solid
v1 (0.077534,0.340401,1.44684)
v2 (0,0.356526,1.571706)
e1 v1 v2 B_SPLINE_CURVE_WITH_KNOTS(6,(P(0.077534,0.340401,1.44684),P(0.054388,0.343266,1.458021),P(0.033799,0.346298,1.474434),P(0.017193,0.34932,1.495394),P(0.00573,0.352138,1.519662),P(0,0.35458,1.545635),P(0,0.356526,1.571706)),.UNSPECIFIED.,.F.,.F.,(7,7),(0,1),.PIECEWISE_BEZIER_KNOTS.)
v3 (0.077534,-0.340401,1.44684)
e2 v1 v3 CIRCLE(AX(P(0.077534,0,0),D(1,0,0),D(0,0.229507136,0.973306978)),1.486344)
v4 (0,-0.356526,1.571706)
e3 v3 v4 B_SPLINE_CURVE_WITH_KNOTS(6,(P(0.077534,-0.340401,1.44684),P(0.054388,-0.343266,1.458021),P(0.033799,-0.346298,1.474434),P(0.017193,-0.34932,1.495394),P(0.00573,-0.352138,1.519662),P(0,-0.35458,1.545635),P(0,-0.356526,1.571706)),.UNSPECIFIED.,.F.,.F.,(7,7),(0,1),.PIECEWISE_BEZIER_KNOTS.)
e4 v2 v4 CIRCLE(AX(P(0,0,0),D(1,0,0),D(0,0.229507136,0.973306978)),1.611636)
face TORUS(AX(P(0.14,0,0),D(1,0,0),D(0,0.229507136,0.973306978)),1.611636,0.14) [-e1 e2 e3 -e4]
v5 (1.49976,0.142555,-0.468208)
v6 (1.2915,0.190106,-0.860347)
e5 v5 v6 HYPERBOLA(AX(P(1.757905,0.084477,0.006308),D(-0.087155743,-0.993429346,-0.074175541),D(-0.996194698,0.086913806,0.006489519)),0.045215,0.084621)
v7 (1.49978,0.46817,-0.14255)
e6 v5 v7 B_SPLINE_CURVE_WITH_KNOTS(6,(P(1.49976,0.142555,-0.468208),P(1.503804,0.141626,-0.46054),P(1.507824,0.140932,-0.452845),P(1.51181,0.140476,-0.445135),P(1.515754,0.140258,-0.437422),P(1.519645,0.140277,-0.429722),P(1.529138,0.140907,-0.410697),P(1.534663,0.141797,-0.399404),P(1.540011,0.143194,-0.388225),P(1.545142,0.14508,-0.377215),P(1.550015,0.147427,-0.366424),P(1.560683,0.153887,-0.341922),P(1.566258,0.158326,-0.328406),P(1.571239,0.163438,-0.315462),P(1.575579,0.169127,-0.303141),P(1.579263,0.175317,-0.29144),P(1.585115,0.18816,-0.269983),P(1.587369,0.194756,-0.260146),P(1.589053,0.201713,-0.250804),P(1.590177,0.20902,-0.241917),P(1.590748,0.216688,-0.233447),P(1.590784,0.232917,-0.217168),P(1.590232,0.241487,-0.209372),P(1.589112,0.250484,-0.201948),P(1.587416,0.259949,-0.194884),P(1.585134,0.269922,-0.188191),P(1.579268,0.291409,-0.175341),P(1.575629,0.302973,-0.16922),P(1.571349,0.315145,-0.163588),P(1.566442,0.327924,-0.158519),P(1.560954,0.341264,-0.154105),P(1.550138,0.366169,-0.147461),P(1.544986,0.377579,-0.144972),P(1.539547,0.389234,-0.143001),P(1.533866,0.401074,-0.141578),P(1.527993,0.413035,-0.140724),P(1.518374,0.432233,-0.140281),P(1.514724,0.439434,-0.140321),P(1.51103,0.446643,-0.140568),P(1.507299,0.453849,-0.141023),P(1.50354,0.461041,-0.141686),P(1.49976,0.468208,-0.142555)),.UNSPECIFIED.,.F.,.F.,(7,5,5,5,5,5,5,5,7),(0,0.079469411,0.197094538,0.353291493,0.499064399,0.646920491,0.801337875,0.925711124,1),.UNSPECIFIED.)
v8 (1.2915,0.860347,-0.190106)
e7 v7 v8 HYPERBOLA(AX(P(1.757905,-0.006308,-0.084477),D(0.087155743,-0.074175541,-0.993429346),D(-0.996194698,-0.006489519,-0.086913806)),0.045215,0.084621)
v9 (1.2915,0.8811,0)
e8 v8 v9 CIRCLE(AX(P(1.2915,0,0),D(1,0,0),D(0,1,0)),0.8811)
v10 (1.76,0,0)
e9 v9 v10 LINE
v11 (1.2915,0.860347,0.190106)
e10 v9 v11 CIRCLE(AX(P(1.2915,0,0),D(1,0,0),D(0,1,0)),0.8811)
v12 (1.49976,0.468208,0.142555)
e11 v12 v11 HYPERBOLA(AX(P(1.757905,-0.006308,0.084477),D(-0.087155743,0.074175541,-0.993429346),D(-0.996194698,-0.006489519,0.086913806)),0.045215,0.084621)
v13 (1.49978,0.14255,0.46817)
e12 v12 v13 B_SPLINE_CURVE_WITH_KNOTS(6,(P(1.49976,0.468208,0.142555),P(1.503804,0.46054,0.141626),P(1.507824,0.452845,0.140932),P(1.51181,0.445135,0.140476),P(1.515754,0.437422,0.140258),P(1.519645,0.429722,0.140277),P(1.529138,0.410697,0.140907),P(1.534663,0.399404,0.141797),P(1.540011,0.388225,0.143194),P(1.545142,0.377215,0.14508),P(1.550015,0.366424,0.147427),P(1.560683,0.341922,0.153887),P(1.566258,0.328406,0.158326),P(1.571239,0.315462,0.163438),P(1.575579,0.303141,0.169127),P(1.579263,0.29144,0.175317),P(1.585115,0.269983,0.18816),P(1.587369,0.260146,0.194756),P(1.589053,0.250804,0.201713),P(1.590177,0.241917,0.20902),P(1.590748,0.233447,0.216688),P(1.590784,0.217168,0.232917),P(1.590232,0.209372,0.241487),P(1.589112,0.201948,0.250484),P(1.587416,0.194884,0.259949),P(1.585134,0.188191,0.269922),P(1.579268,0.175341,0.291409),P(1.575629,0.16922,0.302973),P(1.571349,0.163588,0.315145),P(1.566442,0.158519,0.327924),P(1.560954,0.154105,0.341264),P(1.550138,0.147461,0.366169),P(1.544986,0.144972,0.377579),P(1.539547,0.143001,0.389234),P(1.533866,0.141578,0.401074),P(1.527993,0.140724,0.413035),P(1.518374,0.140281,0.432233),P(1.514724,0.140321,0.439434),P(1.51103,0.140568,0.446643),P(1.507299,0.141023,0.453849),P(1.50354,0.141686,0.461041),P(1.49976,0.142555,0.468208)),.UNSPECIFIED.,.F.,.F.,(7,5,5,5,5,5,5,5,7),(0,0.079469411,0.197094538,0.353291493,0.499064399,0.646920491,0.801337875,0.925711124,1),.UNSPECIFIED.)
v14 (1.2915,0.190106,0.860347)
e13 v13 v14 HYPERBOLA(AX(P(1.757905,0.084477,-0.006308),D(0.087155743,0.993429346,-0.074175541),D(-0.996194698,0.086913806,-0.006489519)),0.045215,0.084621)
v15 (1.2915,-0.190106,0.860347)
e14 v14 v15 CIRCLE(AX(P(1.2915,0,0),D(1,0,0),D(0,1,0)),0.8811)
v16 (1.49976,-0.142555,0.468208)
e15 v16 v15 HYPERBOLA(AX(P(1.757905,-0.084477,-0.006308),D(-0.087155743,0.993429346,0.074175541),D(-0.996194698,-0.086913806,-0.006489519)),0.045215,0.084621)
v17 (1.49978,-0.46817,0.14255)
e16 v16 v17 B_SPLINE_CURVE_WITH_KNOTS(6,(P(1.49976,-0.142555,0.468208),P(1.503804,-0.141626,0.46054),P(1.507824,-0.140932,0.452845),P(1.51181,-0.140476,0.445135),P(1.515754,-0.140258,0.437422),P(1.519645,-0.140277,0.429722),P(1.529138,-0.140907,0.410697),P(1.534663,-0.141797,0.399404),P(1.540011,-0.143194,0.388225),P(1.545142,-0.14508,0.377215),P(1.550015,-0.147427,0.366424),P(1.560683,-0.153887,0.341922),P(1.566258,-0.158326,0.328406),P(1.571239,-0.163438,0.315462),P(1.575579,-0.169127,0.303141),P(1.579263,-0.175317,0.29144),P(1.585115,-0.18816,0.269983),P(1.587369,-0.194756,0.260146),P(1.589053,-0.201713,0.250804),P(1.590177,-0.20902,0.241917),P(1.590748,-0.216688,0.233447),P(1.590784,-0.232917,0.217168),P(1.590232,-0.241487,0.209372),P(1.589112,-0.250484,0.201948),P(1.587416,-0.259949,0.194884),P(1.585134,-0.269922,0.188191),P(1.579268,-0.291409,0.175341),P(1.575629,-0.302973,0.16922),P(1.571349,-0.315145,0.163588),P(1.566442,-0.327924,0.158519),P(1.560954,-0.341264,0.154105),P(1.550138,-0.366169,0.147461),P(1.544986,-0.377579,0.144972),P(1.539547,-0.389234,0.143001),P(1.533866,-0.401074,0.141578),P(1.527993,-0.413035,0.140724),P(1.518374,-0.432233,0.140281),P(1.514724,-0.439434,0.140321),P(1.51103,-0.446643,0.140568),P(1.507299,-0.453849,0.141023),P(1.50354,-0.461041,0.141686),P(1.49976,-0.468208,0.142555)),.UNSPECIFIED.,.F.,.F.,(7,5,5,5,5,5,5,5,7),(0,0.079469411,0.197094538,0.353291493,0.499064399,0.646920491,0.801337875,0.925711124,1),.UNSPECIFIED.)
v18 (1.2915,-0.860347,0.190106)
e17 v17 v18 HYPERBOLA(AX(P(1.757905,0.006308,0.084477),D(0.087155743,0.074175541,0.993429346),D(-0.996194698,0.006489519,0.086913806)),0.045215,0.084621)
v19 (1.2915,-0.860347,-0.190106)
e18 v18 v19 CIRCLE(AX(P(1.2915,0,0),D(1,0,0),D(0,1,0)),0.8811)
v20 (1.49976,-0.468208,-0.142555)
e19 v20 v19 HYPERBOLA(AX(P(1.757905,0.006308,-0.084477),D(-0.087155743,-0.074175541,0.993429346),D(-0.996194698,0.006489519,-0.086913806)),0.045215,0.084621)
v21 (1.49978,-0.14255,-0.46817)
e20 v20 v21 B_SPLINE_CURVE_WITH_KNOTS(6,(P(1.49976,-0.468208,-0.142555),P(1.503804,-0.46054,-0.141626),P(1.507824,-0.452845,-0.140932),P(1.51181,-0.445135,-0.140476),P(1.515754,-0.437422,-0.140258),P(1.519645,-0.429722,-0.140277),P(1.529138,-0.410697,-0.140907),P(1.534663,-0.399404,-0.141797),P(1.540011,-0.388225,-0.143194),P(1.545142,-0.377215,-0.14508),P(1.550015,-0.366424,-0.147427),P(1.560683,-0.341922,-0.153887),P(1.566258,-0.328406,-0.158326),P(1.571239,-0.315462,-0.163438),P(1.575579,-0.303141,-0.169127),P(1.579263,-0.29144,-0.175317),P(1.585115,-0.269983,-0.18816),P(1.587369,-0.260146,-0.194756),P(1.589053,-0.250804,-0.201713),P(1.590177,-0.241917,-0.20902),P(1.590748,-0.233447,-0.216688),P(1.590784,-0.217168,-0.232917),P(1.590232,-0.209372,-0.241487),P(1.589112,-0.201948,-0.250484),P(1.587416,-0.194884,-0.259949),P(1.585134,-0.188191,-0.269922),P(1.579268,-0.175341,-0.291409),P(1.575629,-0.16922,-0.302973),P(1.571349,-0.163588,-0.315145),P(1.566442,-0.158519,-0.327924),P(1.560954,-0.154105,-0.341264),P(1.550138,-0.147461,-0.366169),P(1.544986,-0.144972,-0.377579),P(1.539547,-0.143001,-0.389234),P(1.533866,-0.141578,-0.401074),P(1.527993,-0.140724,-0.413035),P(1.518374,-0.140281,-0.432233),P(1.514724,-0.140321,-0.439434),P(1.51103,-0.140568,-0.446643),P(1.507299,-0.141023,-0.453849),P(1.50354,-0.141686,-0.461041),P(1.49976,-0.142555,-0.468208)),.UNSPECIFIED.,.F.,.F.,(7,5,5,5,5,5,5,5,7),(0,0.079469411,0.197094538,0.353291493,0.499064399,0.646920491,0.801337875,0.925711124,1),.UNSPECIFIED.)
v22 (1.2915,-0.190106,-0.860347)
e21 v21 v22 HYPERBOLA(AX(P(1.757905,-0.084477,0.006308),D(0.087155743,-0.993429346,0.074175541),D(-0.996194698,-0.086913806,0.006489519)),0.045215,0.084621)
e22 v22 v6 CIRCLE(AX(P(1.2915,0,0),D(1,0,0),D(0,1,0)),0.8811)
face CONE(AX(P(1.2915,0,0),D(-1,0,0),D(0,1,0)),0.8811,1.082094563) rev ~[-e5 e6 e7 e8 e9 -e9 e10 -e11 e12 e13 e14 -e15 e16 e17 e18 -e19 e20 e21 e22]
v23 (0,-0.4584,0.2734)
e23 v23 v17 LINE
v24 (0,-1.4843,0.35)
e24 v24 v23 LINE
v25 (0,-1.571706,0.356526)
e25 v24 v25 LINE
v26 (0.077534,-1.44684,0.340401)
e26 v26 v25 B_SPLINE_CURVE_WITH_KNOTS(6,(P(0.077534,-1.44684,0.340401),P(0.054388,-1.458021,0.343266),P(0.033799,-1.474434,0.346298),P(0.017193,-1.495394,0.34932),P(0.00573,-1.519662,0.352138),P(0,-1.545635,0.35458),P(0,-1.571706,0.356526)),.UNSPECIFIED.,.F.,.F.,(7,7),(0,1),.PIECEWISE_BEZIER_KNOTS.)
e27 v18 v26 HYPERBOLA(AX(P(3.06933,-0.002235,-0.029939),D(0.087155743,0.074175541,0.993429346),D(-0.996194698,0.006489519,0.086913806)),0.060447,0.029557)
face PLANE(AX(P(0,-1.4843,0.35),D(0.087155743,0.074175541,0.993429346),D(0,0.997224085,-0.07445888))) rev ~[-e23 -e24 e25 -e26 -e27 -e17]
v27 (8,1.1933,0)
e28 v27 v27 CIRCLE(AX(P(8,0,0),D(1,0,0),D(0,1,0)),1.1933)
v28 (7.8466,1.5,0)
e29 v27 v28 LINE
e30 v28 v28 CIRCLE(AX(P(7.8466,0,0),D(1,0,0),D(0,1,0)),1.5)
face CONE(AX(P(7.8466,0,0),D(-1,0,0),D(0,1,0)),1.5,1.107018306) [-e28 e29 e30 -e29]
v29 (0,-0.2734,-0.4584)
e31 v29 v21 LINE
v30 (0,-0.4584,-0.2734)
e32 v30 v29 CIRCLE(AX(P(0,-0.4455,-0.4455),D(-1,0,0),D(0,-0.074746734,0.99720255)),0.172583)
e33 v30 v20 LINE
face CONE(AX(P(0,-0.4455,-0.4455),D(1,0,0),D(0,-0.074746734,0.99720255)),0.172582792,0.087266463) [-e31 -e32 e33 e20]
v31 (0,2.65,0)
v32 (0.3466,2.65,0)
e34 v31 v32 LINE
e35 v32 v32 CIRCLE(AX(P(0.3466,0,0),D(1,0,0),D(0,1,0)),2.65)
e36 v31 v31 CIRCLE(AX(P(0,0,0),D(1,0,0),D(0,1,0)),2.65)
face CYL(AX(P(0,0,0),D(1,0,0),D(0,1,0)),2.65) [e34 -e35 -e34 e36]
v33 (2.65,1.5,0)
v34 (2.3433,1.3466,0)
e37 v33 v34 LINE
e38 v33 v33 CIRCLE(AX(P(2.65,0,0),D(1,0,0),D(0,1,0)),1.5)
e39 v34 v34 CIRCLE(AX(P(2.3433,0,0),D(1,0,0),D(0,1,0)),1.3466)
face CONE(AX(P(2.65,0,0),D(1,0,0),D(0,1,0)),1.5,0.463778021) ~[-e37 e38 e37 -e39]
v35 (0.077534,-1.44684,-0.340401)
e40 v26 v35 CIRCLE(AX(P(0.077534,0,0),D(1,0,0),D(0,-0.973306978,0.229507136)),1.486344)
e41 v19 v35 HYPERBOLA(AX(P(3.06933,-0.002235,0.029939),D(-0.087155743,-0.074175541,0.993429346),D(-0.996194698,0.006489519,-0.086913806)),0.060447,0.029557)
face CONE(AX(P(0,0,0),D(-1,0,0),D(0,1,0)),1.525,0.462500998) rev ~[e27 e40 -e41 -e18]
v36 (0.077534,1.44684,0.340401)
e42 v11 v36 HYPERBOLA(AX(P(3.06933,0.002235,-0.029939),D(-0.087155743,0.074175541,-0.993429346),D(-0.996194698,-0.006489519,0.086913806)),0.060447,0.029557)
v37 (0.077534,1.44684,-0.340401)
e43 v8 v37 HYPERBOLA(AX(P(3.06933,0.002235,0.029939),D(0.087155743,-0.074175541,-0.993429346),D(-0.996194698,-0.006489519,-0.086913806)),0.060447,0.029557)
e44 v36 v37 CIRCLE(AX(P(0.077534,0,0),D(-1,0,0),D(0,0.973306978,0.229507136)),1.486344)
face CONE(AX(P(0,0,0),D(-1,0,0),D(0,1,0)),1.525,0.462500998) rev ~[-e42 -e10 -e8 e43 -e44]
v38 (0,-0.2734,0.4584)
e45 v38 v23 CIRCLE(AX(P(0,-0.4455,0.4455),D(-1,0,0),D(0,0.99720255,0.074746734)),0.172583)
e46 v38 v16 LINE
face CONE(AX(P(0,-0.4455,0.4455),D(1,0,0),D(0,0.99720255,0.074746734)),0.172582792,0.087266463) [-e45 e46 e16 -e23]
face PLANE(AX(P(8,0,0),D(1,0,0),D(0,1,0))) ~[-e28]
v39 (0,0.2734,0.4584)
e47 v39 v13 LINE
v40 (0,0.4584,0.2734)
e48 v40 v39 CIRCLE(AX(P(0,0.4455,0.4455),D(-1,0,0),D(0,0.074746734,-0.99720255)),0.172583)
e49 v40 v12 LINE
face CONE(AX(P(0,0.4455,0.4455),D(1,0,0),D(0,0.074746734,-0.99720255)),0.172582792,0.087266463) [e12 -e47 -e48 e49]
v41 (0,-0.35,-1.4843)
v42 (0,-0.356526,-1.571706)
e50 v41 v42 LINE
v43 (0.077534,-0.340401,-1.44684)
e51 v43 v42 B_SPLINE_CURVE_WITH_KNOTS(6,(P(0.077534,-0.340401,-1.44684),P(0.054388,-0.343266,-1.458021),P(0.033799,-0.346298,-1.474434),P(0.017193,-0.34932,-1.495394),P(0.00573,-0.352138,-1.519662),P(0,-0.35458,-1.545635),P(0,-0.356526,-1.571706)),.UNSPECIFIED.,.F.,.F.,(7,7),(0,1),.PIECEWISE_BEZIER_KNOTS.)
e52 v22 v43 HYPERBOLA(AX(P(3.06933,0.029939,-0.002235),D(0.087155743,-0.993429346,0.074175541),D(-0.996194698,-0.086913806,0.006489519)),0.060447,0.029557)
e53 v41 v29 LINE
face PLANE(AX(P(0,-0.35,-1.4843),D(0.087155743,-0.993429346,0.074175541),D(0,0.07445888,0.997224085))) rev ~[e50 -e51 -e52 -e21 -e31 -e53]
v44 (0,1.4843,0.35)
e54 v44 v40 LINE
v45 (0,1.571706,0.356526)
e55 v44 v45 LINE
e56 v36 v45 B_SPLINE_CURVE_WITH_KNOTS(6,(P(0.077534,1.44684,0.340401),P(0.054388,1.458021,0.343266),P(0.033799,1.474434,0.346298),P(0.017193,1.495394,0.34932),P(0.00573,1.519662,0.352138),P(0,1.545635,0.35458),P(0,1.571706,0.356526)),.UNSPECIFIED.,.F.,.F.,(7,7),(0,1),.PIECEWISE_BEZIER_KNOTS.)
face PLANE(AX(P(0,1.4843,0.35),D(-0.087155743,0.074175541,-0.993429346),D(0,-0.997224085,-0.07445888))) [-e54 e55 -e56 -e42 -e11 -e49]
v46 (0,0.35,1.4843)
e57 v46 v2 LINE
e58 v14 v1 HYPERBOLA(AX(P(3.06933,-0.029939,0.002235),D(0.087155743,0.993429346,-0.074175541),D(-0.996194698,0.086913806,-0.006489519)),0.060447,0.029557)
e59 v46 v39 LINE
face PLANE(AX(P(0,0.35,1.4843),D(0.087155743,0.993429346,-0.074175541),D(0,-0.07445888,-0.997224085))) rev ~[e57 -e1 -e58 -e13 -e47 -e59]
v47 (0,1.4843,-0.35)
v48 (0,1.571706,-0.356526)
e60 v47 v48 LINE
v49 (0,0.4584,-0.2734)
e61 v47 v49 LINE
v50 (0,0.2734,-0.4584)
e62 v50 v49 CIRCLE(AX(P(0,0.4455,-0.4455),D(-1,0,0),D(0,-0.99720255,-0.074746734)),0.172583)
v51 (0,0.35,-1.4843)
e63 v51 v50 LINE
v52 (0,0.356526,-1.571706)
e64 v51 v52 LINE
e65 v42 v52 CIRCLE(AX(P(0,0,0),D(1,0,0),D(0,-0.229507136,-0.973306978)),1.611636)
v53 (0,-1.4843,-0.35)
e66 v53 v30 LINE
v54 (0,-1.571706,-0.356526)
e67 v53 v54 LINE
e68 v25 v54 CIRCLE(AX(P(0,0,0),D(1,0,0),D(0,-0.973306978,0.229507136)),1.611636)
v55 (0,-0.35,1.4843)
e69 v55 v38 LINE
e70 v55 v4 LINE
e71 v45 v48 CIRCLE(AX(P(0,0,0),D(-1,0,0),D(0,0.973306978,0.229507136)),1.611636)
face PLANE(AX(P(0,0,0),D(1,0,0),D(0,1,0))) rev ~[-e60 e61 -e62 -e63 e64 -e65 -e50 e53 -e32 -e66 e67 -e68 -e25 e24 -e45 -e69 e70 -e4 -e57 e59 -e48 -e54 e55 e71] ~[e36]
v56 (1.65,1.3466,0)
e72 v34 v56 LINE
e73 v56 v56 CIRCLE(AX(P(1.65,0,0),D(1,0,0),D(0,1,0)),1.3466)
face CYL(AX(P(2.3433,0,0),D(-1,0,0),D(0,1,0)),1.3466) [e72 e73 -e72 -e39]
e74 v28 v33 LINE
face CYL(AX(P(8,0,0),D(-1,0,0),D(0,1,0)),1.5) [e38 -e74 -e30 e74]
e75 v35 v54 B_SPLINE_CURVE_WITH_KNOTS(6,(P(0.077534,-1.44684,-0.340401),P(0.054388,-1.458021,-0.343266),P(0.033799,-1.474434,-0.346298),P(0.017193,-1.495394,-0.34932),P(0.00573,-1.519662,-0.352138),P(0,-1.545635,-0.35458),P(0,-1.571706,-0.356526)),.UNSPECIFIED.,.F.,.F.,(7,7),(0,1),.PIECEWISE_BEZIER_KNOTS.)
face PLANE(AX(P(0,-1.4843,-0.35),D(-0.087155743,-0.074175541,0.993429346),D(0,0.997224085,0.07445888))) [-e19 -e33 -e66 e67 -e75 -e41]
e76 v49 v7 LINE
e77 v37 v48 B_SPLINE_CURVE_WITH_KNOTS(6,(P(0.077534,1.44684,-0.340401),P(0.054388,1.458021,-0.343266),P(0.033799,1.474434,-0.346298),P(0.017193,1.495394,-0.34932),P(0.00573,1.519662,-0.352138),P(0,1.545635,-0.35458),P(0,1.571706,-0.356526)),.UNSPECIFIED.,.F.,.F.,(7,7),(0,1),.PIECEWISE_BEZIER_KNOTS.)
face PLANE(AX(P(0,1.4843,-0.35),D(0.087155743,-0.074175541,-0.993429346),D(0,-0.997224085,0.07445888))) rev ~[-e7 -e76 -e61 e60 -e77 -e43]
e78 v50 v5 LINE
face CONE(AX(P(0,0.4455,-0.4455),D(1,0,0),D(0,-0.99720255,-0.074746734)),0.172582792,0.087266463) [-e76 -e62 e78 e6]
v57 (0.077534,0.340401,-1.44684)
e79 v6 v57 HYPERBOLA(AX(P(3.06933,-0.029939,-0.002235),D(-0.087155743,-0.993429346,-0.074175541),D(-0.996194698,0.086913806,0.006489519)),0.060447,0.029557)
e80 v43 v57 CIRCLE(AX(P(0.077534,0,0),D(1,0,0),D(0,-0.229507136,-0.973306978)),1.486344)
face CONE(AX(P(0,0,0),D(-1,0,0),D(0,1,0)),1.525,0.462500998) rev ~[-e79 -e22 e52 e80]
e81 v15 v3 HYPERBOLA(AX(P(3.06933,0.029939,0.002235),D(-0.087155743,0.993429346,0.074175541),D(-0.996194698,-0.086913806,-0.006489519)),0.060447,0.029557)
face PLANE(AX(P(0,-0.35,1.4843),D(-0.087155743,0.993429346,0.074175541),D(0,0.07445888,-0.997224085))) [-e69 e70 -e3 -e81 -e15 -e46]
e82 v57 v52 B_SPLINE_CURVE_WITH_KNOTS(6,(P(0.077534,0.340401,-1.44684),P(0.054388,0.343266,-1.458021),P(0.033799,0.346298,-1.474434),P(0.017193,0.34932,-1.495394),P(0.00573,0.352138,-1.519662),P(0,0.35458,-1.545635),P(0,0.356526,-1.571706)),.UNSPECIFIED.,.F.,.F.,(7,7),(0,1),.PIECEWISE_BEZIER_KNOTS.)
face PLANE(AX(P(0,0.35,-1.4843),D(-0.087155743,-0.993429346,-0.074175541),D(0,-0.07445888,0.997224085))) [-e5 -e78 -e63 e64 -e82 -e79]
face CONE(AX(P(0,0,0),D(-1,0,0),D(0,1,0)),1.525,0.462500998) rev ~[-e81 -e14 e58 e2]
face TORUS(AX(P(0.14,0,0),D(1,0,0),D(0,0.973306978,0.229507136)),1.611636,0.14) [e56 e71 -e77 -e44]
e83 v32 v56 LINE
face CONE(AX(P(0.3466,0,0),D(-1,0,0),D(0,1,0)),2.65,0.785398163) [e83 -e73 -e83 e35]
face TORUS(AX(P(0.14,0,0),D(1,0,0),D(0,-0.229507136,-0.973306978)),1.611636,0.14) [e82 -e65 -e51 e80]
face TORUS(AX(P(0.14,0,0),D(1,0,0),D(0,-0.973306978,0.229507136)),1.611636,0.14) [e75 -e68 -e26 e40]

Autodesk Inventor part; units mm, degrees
ref_plane "YZ Plane" through (0, 0, 0) normal (1, 0, 0) x (0, 1, 0)
ref_plane "XZ Plane" through (0, 0, 0) normal (0, 1, 0) x (-1, 0, 0)
sketch "Szkic1" plane through (0, 0, 0) normal (0, 0, 1) x (1, 0, 0)
  line L0 (1.76, 0) -> (8, 0)
  line L1 (8, 0) -> (8, 1.5)
  line L2 (8, 1.5) -> (2.65, 1.5)
  line L3 (2.65, 1.5) -> (2.3433, 1.3466)
  line L4 (2.3433, 1.3466) -> (1.65, 1.3466)
  line L5 (0, 2.65) -> (0, 1.525)
  line L6 (0, 1.525) -> (1.2915, 0.8811)
  line L7 (1.2915, 0.8811) -> (1.76, 0)
  line L8 (-1.6, 0) -> (9.6, 0) projected
  line L9 (0, -0.53) -> (0, 3.18) projected
  line L10 (0, 2.65) -> (0.3466, 2.65)
  line L11 (0.3466, 2.65) -> (1.65, 1.3466)
  line L12 (2.65, 1.5) -> (1.4966, 1.5) construction
  dimension "d1" = 5.35
  dimension "d2" = 3
  dimension "d3" = 2.6933
  dimension "d4" = 3.05
  dimension "d5" = 26.5
  dimension "d6" = 62
  dimension "d7" = 1.76
  dimension "d8" = 0.3067
  dimension "d12" = 5.3
  dimension "d13" = 45
  dimension "d15" = 8
  dimension "d24" = 1.65
revolve "Bryła" add sketch "Szkic1" angle 360 about axis through (1.76, 0, 0) along (1, 0, 0) contours L7 L6 L5 L10 L11 L4 L3 L2 L1 L0
sketch "Szkic2" plane through (0, 0, 0) normal (-1, 0, 0) x (0, 0, 1)
  line L0 (0, 1.525) -> (0, 0) construction
  line L1 (0, 0) -> (1.525, 0) construction
  arc A0 (0.4575, 0) -> (0, 0.4575) centre (0, 0) ccw construction
  arc A1 (0.5338, 0) -> (0, 0.5337) centre (0, 0) ccw construction
  arc A2 (1.4843, 0.35) -> (0.35, 1.4843) centre (0, 0) ccw
  line L2 (0, 0) -> (1.0783, 1.0783) construction
  line L3 (0.35, 1.4843) -> (0.2734, 0.4584)
  line L4 (1.4843, 0.35) -> (0.4584, 0.2734)
  arc A3 (0.35, 1.4843) -> (0, 1.525) centre (0, 0) ccw
  arc A4 (1.525, 0) -> (1.4843, 0.35) centre (0, 0) ccw
  line L5 (0, -3.71) -> (0, 3.71) projected
  line L6 (-3.71, 0) -> (3.71, 0) projected
  arc A5 (0.35, -1.4843) -> (1.4843, -0.35) centre (0, 0) ccw
  line L7 (0.35, -1.4843) -> (0.2734, -0.4584)
  line L8 (1.4843, -0.35) -> (0.4584, -0.2734)
  arc A6 (0, -1.525) -> (0.35, -1.4843) centre (0, 0) ccw
  arc A7 (1.4843, -0.35) -> (1.525, 0) centre (0, 0) ccw
  arc A8 (-0.35, 1.4843) -> (-1.4843, 0.35) centre (0, 0) ccw
  line L9 (-0.35, 1.4843) -> (-0.2734, 0.4584)
  line L10 (-1.4843, 0.35) -> (-0.4584, 0.2734)
  arc A9 (0, 1.525) -> (-0.35, 1.4843) centre (0, 0) ccw
  arc A10 (-1.4843, 0.35) -> (-1.525, 0) centre (0, 0) ccw
  arc A11 (-0.35, -1.4843) -> (0, -1.525) centre (0, 0) ccw
  arc A12 (-1.4843, -0.35) -> (-0.35, -1.4843) centre (0, 0) ccw
  arc A13 (-1.525, 0) -> (-1.4843, -0.35) centre (0, 0) ccw
  line L11 (-1.4843, -0.35) -> (-0.4584, -0.2734)
  line L12 (-0.35, -1.4843) -> (-0.2734, -0.4584)
  arc A14 (0.2734, 0.4584) -> (0.4584, 0.2734) centre (0.4455, 0.4455) ccw
  arc A15 (0.4584, -0.2734) -> (0.2734, -0.4584) centre (0.4455, -0.4455) ccw
  arc A16 (-0.4584, 0.2734) -> (-0.2734, 0.4584) centre (-0.4455, 0.4455) ccw
  arc A17 (-0.2734, -0.4584) -> (-0.4584, -0.2734) centre (-0.4455, -0.4455) ccw
  point P0 (1.0783, -1.0783)
  point P1 (-1.0783, 1.0783)
  point P2 (-1.0783, -1.0783)
  dimension "d17" = 0.915
  dimension "d18" = 1.0675
  dimension "d19" = 3.05
  dimension "d20" = 45
  dimension "d21" = 0.35
extrude "Szczelina" add sketch "Szkic2" against normal up to next draft 5 contours L4 A14 L3 A2 | A5 L7 A15 L8 | L9 A16 L10 A8 | A12 L11 A17 L12
fillet "Zaokrąglenie1" radius 0.14 4 edges at (0, 1.525, 0) (0, 0, -1.525) (0, -1.525, 0) (0, 0, 1.525)
thread "Gwint" size "M3x0.5" class "6g" standard "ISO Metric profile" length 5.35
chamfer "Faza1" distance 0.3067 distance2 0.1534 1 edges at (8, -1.5, 0) measured on face at (8, 0.3888, 0.4512)
ref_plane "Work Plane2" through (3.35, 0, 0) normal (0, 0, -1) x (1, 0, 0)
equation "\"d1\" = GEL"
equation "\"d2\" = GD"
equation "\"d3\" = BDM"
equation "\"d4\" = SDM"
equation "\"d7\" = INTI"
equation "\"d8\" = GAL"
equation "\"d12\" = KOD"
equation "\"d13\" = 0.5 * SEWI"
equation "\"d15\" = NLG"
equation "\"d24\" = KOH"
equation "\"d17\" = 0.3 * SDM"
equation "\"d18\" = 0.35 * SDM"
equation "\"d19\" = SDM"
equation "\"d21\" = 0.5 * SBR"
equation "\"d23\" = 0.2 * SBR"
equation "\"d10\" = GEL"
equation "\"d25\" = -0.5 * SPD + 0.5 * GD"
equation "\"d26\" = 0.5 * GAL"
equation "\"NLG\" = 8"
equation "\"GEL\" = 5.35"
equation "\"GAL\" = 0.61345 * PTC"
equation "\"SPD\" = NND - 1.2269 * PTC"
equation "\"KOD\" = 5.3"
equation "\"KOH\" = 1.65"
equation "\"SBR\" = 0.7"
equation "\"INTI\" = 1.76"
equation "\"SDM\" = 3.05"
equation "\"GD\" = NND"
equation "\"BDM\" = NND - GAL"
equation "\"SEWI\" = 90deg"
equation "\"d9\" = SDM"
equation "\"GUL\" = 0.61345 * PTC"
equation "\"TOA\" = 30deg"
equation "\"EPV\" = 3.15"
equation "\"THREADDIA\" = 3"
equation "\"RR\" = 0.3"
equation "\"PTC\" = 0.5"
equation "\"NND\" = 3"
equation "\"GD1\" = THREADDIA - 1.2269 * PTC"
properties part number "AS 1427 - M3 x 8" material "Stal, miękka"
